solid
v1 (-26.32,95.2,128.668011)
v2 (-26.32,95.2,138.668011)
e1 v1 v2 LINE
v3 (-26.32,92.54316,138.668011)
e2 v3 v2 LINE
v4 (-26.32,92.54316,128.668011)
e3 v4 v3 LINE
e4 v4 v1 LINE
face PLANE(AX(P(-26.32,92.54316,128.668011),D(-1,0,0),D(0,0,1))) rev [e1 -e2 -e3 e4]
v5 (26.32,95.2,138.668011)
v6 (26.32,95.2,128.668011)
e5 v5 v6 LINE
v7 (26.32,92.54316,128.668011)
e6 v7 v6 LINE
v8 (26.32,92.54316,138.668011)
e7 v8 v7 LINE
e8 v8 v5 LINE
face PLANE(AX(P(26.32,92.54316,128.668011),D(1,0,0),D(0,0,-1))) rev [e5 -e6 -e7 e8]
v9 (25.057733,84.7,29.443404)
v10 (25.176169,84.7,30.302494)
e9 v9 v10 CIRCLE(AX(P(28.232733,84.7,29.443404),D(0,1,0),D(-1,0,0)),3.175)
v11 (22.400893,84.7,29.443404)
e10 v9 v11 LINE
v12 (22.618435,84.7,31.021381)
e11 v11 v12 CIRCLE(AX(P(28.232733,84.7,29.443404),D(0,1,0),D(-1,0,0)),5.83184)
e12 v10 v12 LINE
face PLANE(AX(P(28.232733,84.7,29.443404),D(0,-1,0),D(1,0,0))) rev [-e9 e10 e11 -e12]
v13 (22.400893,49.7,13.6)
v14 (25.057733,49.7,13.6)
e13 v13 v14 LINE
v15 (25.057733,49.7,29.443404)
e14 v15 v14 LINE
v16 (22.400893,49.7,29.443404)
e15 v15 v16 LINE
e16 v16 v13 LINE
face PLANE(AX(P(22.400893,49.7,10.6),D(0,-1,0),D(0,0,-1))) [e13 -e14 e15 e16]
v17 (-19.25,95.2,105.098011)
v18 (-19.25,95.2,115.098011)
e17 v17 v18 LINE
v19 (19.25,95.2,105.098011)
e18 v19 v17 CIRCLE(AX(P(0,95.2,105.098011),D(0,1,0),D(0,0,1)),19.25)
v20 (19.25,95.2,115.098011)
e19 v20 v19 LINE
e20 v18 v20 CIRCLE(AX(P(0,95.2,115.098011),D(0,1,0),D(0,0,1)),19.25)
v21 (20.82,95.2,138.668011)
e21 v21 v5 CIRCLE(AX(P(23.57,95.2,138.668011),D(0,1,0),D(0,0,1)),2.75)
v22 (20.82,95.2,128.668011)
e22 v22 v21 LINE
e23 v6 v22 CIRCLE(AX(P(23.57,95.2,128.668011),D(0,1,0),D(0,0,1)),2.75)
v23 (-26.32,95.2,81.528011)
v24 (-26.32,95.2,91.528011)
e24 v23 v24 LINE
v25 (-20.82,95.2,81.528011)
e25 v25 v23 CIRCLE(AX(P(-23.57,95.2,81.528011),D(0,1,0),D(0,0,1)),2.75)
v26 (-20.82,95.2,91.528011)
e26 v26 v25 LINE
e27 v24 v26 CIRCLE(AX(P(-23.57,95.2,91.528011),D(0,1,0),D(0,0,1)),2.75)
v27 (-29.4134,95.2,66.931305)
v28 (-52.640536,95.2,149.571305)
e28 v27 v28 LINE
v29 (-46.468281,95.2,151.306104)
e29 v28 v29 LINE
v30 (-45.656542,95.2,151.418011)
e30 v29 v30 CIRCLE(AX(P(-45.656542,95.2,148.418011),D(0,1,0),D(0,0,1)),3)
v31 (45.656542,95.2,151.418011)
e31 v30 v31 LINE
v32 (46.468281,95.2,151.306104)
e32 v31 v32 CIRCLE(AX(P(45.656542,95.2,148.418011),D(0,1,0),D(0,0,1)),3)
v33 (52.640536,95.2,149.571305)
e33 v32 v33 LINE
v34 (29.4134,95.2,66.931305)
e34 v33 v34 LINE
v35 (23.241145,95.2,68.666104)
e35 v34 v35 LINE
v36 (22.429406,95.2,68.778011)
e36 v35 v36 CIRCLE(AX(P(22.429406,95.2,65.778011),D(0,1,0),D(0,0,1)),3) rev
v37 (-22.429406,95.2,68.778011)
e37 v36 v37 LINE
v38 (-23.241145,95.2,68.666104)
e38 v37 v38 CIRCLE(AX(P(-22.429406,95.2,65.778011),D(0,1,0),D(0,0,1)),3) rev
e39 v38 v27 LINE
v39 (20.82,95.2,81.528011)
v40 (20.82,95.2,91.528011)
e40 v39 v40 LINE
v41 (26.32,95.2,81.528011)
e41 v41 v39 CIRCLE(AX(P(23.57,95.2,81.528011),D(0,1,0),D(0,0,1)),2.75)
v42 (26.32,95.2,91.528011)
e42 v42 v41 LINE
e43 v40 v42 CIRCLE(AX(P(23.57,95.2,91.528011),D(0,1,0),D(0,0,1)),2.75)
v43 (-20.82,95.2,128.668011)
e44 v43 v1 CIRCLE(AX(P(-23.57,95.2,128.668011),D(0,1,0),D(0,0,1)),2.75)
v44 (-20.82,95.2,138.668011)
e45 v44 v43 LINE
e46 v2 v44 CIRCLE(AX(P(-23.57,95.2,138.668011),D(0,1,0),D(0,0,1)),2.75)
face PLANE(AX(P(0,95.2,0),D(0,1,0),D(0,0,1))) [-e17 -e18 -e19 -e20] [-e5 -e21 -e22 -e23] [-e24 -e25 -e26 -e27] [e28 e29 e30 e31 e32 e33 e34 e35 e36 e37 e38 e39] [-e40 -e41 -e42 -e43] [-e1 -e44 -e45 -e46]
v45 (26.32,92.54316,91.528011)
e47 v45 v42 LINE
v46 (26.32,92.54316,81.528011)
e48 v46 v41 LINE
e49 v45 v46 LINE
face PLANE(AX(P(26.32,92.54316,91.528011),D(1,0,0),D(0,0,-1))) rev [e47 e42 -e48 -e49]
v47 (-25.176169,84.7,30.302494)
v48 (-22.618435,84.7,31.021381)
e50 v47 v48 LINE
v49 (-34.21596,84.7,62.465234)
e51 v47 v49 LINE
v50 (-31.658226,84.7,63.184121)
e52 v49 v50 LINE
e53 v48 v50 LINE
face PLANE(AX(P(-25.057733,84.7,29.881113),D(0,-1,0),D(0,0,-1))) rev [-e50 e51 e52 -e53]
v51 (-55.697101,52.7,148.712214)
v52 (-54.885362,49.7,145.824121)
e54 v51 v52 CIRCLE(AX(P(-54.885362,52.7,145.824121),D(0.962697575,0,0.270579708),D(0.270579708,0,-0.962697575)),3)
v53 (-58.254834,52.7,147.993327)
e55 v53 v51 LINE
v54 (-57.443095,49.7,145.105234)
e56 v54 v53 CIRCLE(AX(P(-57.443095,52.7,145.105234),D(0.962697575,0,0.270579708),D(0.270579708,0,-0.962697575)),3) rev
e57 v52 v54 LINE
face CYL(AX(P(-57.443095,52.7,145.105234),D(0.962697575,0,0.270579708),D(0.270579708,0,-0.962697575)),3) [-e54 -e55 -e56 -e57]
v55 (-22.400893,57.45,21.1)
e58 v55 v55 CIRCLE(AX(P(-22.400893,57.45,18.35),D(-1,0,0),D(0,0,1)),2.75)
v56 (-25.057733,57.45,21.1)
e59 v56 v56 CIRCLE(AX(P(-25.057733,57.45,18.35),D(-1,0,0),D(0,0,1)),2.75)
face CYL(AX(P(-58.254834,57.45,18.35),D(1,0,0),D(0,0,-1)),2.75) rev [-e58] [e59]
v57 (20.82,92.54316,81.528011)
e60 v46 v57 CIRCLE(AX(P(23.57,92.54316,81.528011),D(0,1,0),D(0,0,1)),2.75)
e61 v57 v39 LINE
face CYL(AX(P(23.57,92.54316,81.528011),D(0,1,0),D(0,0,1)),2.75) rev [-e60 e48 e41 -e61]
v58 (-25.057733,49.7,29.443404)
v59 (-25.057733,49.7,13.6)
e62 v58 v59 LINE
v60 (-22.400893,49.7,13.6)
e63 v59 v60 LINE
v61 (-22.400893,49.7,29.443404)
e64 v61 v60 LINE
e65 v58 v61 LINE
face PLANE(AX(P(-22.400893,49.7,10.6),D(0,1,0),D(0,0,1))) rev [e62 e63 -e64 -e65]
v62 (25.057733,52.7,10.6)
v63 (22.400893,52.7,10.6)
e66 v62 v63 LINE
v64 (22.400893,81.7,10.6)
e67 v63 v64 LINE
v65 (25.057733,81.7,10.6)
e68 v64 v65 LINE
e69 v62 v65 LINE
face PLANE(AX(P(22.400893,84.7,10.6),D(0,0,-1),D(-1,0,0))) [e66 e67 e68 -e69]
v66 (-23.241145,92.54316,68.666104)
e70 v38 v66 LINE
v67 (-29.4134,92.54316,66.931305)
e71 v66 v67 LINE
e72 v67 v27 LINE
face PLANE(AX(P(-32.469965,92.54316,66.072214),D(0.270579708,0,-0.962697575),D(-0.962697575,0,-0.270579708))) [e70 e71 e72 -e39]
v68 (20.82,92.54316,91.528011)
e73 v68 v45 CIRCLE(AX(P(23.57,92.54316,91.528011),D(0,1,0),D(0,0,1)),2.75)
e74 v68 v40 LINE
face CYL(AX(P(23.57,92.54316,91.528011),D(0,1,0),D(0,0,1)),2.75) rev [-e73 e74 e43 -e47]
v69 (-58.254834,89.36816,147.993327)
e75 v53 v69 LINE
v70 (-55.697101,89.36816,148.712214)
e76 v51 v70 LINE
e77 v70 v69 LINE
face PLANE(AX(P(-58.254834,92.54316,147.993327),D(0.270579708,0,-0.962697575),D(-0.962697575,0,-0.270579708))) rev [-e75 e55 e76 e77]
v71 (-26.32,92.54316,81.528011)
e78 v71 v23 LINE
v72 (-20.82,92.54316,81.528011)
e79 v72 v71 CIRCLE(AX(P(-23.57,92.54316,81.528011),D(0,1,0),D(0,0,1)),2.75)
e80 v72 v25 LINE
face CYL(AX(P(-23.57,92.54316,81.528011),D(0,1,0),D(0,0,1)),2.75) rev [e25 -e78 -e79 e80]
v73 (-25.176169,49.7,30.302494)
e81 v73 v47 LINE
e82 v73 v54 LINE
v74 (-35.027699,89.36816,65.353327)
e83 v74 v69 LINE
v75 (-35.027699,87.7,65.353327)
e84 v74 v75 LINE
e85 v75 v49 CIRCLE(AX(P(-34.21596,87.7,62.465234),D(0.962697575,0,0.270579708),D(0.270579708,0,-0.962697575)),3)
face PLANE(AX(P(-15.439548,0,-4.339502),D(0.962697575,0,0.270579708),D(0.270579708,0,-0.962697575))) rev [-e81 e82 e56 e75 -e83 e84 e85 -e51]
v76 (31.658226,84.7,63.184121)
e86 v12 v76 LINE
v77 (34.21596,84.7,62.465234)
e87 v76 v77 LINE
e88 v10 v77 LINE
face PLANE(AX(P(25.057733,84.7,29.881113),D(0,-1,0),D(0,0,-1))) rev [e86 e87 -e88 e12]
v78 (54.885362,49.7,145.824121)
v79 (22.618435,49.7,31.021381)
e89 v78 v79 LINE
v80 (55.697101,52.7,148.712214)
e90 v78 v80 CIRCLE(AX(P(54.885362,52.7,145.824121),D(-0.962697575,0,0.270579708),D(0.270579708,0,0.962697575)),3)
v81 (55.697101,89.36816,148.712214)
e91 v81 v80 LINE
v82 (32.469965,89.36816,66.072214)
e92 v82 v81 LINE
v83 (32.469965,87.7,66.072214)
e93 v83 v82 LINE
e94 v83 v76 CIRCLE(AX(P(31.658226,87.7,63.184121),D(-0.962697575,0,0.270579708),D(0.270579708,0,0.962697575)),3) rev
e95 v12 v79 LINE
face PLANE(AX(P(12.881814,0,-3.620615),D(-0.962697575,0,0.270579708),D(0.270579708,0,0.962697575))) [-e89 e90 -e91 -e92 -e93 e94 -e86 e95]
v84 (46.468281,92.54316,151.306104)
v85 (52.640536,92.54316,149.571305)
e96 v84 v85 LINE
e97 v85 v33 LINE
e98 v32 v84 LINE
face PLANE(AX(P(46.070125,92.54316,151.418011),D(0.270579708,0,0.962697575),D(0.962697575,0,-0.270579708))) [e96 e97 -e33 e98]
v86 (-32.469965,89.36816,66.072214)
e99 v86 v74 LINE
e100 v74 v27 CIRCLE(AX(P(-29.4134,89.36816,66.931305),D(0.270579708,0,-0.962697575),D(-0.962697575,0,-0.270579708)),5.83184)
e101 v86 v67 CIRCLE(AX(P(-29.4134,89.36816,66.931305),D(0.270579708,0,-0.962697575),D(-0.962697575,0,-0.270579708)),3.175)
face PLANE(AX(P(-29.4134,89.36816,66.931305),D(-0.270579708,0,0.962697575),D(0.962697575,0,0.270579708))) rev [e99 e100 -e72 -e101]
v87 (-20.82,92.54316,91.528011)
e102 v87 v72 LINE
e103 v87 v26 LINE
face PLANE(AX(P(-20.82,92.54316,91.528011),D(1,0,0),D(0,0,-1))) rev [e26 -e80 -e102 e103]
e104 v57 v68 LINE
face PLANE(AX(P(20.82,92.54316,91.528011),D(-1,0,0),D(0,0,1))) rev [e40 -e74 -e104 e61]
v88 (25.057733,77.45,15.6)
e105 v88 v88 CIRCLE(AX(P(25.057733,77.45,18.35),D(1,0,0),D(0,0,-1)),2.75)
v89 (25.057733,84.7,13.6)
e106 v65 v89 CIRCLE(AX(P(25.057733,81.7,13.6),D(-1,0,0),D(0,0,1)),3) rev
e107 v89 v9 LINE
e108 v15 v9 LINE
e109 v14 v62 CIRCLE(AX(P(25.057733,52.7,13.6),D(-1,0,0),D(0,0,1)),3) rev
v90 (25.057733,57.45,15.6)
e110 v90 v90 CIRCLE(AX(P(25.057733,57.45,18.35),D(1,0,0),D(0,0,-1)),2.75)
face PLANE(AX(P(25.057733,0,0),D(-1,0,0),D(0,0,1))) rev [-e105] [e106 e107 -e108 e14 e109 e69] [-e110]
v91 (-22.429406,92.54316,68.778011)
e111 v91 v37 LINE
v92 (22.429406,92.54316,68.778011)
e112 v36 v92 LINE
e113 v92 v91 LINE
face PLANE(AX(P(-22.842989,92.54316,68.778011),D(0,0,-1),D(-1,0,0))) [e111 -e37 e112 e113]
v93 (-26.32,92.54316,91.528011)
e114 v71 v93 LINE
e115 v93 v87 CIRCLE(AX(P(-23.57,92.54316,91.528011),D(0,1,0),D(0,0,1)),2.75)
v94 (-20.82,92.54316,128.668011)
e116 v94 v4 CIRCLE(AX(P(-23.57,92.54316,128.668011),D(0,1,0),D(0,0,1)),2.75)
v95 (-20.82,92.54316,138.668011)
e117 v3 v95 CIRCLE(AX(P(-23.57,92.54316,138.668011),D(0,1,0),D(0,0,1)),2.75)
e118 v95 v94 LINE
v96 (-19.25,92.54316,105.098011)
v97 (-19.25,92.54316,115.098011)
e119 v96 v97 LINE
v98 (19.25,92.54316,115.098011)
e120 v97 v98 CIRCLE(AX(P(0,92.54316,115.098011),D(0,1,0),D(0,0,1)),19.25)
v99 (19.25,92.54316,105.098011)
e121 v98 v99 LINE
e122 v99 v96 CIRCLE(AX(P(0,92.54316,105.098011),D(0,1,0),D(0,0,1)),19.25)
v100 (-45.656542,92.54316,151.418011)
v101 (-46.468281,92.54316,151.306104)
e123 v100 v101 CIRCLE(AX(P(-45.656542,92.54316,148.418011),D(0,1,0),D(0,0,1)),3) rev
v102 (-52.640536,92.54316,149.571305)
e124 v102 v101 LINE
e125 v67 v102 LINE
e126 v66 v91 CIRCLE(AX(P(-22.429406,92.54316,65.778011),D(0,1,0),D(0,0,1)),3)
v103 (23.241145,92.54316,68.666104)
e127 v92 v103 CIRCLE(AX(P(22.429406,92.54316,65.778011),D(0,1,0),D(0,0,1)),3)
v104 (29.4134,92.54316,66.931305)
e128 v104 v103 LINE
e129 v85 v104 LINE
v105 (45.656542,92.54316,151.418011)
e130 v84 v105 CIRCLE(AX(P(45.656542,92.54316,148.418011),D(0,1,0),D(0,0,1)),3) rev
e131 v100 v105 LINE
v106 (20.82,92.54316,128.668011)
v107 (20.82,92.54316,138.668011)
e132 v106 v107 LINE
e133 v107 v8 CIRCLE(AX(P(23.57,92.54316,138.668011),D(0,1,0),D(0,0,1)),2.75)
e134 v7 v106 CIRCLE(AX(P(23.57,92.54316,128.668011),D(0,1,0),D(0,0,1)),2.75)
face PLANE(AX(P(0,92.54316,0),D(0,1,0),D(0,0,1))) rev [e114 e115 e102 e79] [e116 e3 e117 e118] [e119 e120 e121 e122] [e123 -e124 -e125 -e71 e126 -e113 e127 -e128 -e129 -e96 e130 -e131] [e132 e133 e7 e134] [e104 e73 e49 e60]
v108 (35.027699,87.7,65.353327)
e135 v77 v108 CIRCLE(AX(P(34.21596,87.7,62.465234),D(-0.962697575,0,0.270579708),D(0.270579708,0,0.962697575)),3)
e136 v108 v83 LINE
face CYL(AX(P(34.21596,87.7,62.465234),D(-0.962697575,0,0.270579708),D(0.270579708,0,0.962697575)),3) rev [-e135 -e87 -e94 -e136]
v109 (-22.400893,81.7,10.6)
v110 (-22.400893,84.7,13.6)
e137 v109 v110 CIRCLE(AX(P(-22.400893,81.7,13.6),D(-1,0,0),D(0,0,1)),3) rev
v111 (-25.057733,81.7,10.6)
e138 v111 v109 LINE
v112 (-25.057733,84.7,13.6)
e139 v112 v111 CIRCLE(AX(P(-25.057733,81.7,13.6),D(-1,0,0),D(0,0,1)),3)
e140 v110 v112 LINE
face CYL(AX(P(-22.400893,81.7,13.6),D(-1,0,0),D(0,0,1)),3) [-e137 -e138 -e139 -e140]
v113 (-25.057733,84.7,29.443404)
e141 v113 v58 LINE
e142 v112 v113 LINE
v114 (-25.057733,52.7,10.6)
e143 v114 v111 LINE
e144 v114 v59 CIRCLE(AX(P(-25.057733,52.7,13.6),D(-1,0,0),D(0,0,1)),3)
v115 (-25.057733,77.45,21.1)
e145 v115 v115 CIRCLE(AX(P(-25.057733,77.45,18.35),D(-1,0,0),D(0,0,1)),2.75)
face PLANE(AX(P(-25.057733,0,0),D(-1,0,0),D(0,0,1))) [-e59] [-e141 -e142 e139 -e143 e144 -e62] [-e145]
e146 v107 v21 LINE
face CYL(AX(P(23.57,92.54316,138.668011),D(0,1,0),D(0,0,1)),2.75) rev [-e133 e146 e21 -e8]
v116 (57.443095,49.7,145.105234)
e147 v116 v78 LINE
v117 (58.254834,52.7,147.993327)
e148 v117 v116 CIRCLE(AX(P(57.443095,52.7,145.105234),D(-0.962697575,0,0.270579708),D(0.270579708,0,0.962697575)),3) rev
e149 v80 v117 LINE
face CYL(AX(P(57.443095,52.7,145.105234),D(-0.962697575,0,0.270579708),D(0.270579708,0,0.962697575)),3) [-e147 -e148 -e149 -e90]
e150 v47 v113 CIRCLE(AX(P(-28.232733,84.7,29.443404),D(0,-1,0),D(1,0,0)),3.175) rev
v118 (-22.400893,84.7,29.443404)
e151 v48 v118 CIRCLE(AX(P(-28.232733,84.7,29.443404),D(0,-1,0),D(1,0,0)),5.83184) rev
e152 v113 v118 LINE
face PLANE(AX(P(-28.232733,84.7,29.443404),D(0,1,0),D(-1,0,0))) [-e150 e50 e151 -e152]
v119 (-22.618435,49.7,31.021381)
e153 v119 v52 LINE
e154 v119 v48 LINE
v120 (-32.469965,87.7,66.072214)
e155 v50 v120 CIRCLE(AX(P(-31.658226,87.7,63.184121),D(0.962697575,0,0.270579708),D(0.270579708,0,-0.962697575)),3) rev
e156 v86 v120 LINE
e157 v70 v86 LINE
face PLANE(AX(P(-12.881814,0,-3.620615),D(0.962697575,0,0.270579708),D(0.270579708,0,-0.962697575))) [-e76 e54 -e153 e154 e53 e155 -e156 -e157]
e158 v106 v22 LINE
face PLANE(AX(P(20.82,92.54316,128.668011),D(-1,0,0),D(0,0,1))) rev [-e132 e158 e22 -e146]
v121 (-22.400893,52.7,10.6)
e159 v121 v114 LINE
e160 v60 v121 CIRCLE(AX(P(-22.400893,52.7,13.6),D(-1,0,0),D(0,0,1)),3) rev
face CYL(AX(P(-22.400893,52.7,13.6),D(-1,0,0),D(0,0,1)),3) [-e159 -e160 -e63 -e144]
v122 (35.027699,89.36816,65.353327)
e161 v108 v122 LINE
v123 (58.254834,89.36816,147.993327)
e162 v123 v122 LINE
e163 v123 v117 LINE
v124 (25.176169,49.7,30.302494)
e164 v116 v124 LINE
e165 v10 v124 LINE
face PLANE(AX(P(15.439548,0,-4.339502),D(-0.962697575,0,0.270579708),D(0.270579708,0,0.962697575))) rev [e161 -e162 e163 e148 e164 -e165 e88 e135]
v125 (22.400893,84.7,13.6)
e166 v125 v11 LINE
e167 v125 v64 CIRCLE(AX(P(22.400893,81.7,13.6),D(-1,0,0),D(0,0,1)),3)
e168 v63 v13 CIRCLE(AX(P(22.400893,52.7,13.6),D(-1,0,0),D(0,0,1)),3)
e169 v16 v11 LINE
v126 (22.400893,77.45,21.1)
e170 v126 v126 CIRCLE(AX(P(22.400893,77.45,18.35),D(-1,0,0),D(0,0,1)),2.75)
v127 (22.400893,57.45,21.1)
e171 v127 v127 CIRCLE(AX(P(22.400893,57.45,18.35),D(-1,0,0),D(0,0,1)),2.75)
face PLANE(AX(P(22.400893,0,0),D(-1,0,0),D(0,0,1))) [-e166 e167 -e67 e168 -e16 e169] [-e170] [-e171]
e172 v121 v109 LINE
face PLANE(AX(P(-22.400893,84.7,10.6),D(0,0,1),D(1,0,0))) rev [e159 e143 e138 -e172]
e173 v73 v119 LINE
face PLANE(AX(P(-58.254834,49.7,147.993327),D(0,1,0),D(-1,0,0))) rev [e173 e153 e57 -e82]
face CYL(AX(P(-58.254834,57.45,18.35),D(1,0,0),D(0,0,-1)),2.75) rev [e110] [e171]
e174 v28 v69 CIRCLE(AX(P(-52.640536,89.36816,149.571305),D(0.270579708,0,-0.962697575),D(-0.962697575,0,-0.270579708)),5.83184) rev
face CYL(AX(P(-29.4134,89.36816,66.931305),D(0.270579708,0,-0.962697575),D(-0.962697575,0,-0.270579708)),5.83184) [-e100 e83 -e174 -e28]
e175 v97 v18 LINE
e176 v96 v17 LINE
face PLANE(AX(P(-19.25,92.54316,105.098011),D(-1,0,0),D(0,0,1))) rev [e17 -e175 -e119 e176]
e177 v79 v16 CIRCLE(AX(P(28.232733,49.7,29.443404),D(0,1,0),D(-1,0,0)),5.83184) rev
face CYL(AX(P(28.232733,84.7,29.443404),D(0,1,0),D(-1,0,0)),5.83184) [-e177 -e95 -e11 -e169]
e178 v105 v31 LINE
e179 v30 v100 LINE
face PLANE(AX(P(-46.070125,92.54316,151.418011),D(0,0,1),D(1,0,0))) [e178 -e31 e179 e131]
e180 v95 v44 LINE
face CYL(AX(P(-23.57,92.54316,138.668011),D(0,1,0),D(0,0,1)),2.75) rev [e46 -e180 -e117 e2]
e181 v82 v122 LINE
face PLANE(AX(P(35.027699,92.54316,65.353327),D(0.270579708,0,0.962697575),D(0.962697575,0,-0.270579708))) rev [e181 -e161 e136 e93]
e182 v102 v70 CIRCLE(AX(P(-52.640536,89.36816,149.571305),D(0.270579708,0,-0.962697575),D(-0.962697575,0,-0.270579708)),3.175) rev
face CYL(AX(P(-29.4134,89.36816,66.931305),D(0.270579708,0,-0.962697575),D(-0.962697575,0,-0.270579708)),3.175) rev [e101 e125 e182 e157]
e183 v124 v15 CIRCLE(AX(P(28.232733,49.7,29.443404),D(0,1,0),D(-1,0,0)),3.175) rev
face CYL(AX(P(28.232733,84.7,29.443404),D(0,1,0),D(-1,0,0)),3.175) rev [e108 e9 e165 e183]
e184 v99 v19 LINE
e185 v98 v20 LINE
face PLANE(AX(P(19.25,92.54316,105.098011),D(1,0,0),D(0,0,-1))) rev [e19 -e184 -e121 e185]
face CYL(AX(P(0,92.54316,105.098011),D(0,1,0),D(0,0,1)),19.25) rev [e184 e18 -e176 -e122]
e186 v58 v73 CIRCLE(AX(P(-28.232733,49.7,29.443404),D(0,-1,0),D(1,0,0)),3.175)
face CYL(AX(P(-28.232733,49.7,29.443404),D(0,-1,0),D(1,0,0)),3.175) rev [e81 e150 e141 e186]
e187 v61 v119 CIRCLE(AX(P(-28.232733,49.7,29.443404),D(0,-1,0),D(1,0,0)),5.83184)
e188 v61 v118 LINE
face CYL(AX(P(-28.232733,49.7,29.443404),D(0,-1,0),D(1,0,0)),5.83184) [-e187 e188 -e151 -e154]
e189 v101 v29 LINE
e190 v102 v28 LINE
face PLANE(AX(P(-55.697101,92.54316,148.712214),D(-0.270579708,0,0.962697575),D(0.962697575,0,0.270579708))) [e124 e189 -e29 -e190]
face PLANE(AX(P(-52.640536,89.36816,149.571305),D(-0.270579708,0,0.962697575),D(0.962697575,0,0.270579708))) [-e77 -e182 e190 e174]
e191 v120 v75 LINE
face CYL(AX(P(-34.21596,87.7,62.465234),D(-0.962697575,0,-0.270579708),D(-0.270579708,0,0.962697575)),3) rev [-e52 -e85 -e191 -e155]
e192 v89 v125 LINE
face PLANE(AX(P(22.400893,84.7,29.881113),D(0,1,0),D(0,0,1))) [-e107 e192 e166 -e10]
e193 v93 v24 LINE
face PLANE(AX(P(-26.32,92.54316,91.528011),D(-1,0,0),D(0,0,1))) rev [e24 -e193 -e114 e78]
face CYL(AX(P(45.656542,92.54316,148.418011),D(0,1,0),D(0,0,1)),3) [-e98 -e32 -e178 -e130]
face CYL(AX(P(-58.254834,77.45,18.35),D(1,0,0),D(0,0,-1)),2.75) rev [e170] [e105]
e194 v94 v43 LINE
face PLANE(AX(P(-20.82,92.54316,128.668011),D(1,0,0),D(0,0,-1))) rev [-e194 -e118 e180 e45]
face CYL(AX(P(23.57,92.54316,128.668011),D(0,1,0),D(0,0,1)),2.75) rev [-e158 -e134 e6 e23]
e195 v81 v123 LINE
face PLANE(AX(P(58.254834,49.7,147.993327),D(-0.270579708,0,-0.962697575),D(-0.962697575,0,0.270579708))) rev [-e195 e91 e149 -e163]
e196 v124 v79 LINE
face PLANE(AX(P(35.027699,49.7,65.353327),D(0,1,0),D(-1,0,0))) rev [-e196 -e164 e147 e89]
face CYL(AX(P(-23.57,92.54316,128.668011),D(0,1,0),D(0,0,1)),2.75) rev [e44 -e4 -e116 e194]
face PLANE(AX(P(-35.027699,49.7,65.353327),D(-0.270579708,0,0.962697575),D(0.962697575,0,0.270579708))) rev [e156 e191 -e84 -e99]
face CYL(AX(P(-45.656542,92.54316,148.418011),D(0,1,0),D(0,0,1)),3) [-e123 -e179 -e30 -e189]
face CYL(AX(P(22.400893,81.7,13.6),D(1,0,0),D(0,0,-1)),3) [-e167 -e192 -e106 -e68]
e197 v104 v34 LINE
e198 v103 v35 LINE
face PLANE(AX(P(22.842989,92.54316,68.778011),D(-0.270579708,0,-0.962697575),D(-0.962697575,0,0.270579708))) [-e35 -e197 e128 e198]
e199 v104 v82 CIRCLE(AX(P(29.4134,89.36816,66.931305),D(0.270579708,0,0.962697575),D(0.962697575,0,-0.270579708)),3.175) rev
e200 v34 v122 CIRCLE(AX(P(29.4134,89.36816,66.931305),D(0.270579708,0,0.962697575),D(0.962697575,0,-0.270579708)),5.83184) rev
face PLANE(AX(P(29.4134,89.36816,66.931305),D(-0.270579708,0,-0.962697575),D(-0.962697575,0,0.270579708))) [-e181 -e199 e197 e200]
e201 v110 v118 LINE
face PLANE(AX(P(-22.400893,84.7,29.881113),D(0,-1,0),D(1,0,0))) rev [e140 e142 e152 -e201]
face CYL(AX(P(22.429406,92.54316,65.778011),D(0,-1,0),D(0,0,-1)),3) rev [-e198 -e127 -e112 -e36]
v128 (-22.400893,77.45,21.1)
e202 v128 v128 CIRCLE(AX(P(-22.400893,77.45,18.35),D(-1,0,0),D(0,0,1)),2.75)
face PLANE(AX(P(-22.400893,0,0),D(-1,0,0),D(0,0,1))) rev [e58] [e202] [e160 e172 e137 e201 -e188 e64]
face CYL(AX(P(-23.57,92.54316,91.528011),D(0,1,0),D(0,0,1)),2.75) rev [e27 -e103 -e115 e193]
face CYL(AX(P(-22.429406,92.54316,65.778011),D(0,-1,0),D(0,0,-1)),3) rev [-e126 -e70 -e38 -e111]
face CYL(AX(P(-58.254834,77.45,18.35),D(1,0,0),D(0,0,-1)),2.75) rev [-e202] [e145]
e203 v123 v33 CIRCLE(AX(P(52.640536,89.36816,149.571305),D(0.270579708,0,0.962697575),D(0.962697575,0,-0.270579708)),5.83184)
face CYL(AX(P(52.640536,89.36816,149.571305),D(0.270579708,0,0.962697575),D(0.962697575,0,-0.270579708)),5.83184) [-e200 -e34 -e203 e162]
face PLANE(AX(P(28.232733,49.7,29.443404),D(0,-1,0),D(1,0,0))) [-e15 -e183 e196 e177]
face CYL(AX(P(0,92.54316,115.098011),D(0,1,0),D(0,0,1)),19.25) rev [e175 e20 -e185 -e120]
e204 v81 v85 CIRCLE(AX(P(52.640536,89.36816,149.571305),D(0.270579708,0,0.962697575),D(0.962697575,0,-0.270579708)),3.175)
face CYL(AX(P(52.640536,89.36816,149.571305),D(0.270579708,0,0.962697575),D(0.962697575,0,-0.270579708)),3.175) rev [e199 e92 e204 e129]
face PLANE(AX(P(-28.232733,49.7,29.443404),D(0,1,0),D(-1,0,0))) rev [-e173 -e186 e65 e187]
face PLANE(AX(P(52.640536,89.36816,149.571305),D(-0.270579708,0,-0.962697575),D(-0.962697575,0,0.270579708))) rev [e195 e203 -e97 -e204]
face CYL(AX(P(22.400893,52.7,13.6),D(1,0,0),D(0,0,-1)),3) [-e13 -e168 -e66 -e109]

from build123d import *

# Parameters (mm, degrees)
BASE_FLANGE1_DEPTH             = 2.65684
EDGE_FLANGE2_STRIP_W           = 16.97736
EDGE_FLANGE2_STRIP_H           = 2.65684
EDGE_FLANGE2_STRIP_CUT_DEPTH   = 85.842119192
EDGE_FLANGE2_STRIP_2_W         = 16.97736
EDGE_FLANGE2_STRIP_2_H         = 2.65684
EDGE_FLANGE2_STRIP_CUT_2_DEPTH = 85.842119192
EDGE_FLANGE2_DEPTH             = 85.842119192
EDGE_FLANGE2_BEND_DEPTH        = 85.842119192
SKETCH22_W                     = 2.65684
SKETCH22_H                     = 35
BOSS_EXTRUDE1_DEPTH            = 36.846685
SKETCH24_W                     = 2.65684
SKETCH24_H                     = 35
BOSS_EXTRUDE2_DEPTH            = 36.846685
EDGE_FLANGE3_STRIP_CUT_DEPTH   = 35
EDGE_FLANGE3_DEPTH             = 35
EDGE_FLANGE4_STRIP_CUT_DEPTH   = 35
EDGE_FLANGE4_DEPTH             = 35
SKETCH32_R                     = 2.75
CUT_EXTRUDE1_DEPTH             = 198.310511697
FILLET1_R                      = 3


# Sheet-metal steps are written as plain solids
with BuildPart() as part:
    # Sketch4 → Base-Flange1 (new body)
    with BuildSketch(Plane(origin=(0, 95.2, 0), x_dir=(1, 0, 0), z_dir=(0, 1, 0))):
        Polygon((-55.697100796, -148.712214058), (-46.070125043, -151.418011142), (46.070125043, -151.418011142), (55.697100796, -148.712214058), (32.469965214, -66.072214058), (22.842989462, -68.778011142), (-22.842989462, -68.778011142), (-32.469965214, -66.072214058), align=None)
        with BuildLine():
            Line((-26.32, -128.668011142), (-26.32, -138.668011142))
            ThreePointArc((-26.32, -138.668011142), (-23.57, -141.418011142), (-20.82, -138.668011142))
            Line((-20.82, -138.668011142), (-20.82, -128.668011142))
            ThreePointArc((-20.82, -128.668011142), (-23.57, -125.918011142), (-26.32, -128.668011142))
        make_face(mode=Mode.SUBTRACT)
        with BuildLine():
            Line((20.82, -128.668011142), (20.82, -138.668011142))
            ThreePointArc((20.82, -138.668011142), (23.57, -141.418011142), (26.32, -138.668011142))
            Line((26.32, -138.668011142), (26.32, -128.668011142))
            ThreePointArc((26.32, -128.668011142), (23.57, -125.918011142), (20.82, -128.668011142))
        make_face(mode=Mode.SUBTRACT)
        with BuildLine():
            Line((20.82, -91.528011142), (20.82, -81.528011142))
            ThreePointArc((20.82, -81.528011142), (23.57, -78.778011142), (26.32, -81.528011142))
            Line((26.32, -81.528011142), (26.32, -91.528011142))
            ThreePointArc((26.32, -91.528011142), (23.57, -94.278011142), (20.82, -91.528011142))
        make_face(mode=Mode.SUBTRACT)
        with BuildLine():
            Line((-19.25, -105.098011142), (-19.25, -115.098011142))
            ThreePointArc((-19.25, -115.098011142), (0, -134.348011142), (19.25, -115.098011142))
            Line((19.25, -115.098011142), (19.25, -105.098011142))
            ThreePointArc((19.25, -105.098011142), (0, -85.848011142), (-19.25, -105.098011142))
        make_face(mode=Mode.SUBTRACT)
        with BuildLine():
            Line((-20.82, -91.528011142), (-20.82, -81.528011142))
            ThreePointArc((-20.82, -81.528011142), (-23.57, -78.778011142), (-26.32, -81.528011142))
            Line((-26.32, -81.528011142), (-26.32, -91.528011142))
            ThreePointArc((-26.32, -91.528011142), (-23.57, -94.278011142), (-20.82, -91.528011142))
        make_face(mode=Mode.SUBTRACT)
    extrude(amount=-BASE_FLANGE1_DEPTH)

    # Edge-Flange2 strip (across the edge) → Edge-Flange2 strip cut (cut)
    with BuildSketch(Plane(origin=(32.469965214, 92.54316, 66.072214058), x_dir=(-0.9626975752484609, -3.4914813388431334e-15, 0.2705797084238469), z_dir=(0.2705797084238469, 0, 0.9626975752484609))):
        with Locations((-5.31368, -1.32842)):
            Rectangle(EDGE_FLANGE2_STRIP_W, EDGE_FLANGE2_STRIP_H)
    extrude(amount=EDGE_FLANGE2_STRIP_CUT_DEPTH, mode=Mode.SUBTRACT)

    # Edge-Flange2 strip 2 (across the edge) → Edge-Flange2 strip cut 2 (cut)
    with BuildSketch(Plane(origin=(-55.697100796, 92.54316, 148.712214058), x_dir=(0.9626975752484602, -3.4914813388431334e-15, 0.2705797084238493), z_dir=(0.2705797084238493, 0, -0.9626975752484602))):
        with Locations((-5.31368, -1.32842)):
            Rectangle(EDGE_FLANGE2_STRIP_2_W, EDGE_FLANGE2_STRIP_2_H)
    extrude(amount=EDGE_FLANGE2_STRIP_CUT_2_DEPTH, mode=Mode.SUBTRACT)

    # Edge-Flange2 section (across the edge) → Edge-Flange2 (add)
    with BuildSketch(Plane(origin=(32.469965214, 92.54316, 66.072214058), x_dir=(-0.9626975752484609, -3.4914813388431334e-15, 0.2705797084238469), z_dir=(0.2705797084238469, 0, 0.9626975752484609))):
        with BuildLine():
            Line((-2.65684, 3.175), (-2.65684, 42.84316))
            Line((-2.65684, 42.84316), (0, 42.84316))
            Line((0, 42.84316), (0, 3.175))
            ThreePointArc((0, 3.175), (0.92993597, 0.92993597), (3.175, 0))
            Line((3.175, 0), (3.175, -2.65684))
            ThreePointArc((3.175, -2.65684), (-0.948733611, -0.948733611), (-2.65684, 3.175))
        make_face()
    extrude(amount=EDGE_FLANGE2_DEPTH)

    # Edge-Flange2 section 2 (across the edge) → Edge-Flange2 bend (add)
    with BuildSketch(Plane(origin=(-55.697100796, 92.54316, 148.712214058), x_dir=(0.9626975752484602, -3.4914813388431334e-15, 0.2705797084238493), z_dir=(0.2705797084238493, 0, -0.9626975752484602))):
        with BuildLine():
            Line((-2.65684, 3.175), (-2.65684, 42.84316))
            Line((-2.65684, 42.84316), (0, 42.84316))
            Line((0, 42.84316), (0, 3.175))
            ThreePointArc((0, 3.175), (0.92993597, 0.92993597), (3.175, 0))
            Line((3.175, 0), (3.175, -2.65684))
            ThreePointArc((3.175, -2.65684), (-0.948733611, -0.948733611), (-2.65684, 3.175))
        make_face()
    extrude(amount=EDGE_FLANGE2_BEND_DEPTH)

    # Sketch22 → Boss-Extrude1 (add)
    with BuildSketch(Plane(origin=(19.588150967, 0, 69.69282933), x_dir=(-0.9626975752484609, 0, 0.2705797084238468), z_dir=(-0.2705797084238468, 0, -0.9626975752484609))):
        with Locations((-14.709376365, 67.2)):
            Rectangle(SKETCH22_W, SKETCH22_H)
    extrude(amount=BOSS_EXTRUDE1_DEPTH)

    # Sketch24 → Boss-Extrude2 (add)
    with BuildSketch(Plane(origin=(-19.588150967, 0, 69.69282933), x_dir=(-0.9626975752484602, 0, -0.27057970842384926), z_dir=(0.27057970842384926, 0, -0.9626975752484602))):
        with Locations((14.709376365, 67.2)):
            Rectangle(SKETCH24_W, SKETCH24_H)
    extrude(amount=BOSS_EXTRUDE2_DEPTH)

    # Edge-Flange3 strip (across the edge) → Edge-Flange3 strip cut (cut)
    with BuildSketch(Plane(origin=(25.057733426, 49.7, 29.881113007), x_dir=(1, 0, 0), z_dir=(0, 1, 0))):
        Polygon((-7.033027346, 15.203794832), (-2.439298227, -1.140268474), (0.118435199, -0.421381482), (-4.47529392, 15.922681824), align=None)
    extrude(amount=EDGE_FLANGE3_STRIP_CUT_DEPTH, mode=Mode.SUBTRACT)

    # Edge-Flange3 section (across the edge) → Edge-Flange3 (add)
    with BuildSketch(Plane(origin=(25.057733426, 49.7, 29.881113007), x_dir=(1, 0, 0), z_dir=(0, 1, 0))):
        with BuildLine():
            Line((-2.65684, 0.437709092), (-2.65684, 19.281113007))
            Line((-2.65684, 19.281113007), (0, 19.281113007))
            Line((0, 19.281113007), (0, 0.437709092))
            ThreePointArc((0, 0.437709092), (0.029748162, 0.004101115), (0.118435199, -0.421381482))
            Line((0.118435199, -0.421381482), (-2.439298227, -1.140268474))
            ThreePointArc((-2.439298227, -1.140268474), (-2.602198575, -0.35874204), (-2.65684, 0.437709092))
        make_face()
    extrude(amount=EDGE_FLANGE3_DEPTH)

    # Edge-Flange4 strip (across the edge) → Edge-Flange4 strip cut (cut)
    with BuildSketch(Plane(origin=(-25.057733426, 84.7, 29.881113007), x_dir=(-1, 0, 0), z_dir=(0, -1, 0))):
        Polygon((-7.033027346, 15.203794832), (-2.439298227, -1.140268474), (0.118435199, -0.421381482), (-4.47529392, 15.922681824), align=None)
    extrude(amount=EDGE_FLANGE4_STRIP_CUT_DEPTH, mode=Mode.SUBTRACT)

    # Edge-Flange4 section (across the edge) → Edge-Flange4 (add)
    with BuildSketch(Plane(origin=(-25.057733426, 84.7, 29.881113007), x_dir=(-1, 0, 0), z_dir=(0, -1, 0))):
        with BuildLine():
            Line((-2.65684, 0.437709092), (-2.65684, 19.281113007))
            Line((-2.65684, 19.281113007), (0, 19.281113007))
            Line((0, 19.281113007), (0, 0.437709092))
            ThreePointArc((0, 0.437709092), (0.029748162, 0.004101115), (0.118435199, -0.421381482))
            Line((0.118435199, -0.421381482), (-2.439298227, -1.140268474))
            ThreePointArc((-2.439298227, -1.140268474), (-2.602198575, -0.35874204), (-2.65684, 0.437709092))
        make_face()
    extrude(amount=EDGE_FLANGE4_DEPTH)

    # Sketch32 → Cut-Extrude1 (cut, through all)
    with BuildSketch(Plane(origin=(25.057733426, 0, 0), x_dir=(0, 0, -1), z_dir=(1, 0, 0))):
        with Locations(Location((-18.35, 77.45, 0), (0, 0, 180))):
            Circle(SKETCH32_R)
        with Locations(Location((-18.35, 57.45, 0), (0, 0, 180))):
            Circle(SKETCH32_R)
    extrude(amount=-CUT_EXTRUDE1_DEPTH, mode=Mode.SUBTRACT)

    # Fillet1
    fillet1_edges = [part.edges().sort_by_distance(p)[0] for p in [
        (56.975967508, 49.7, 148.352770562),
        (-22.842989462, 93.87158, 68.778011142),
        (22.842989462, 93.87158, 68.778011142),
        (46.070125043, 93.87158, 151.418011142),
        (-46.070125043, 93.87158, 151.418011142),
        (-56.975967508, 49.7, 148.352770562),
        (33.748831927, 84.7, 65.712770562),
        (-33.748831927, 84.7, 65.712770562),
        (23.729313426, 49.7, 10.6),
        (23.729313426, 84.7, 10.6),
        (-23.729313426, 84.7, 10.6),
        (-23.729313426, 49.7, 10.6),
    ]]
    fillet(fillet1_edges, radius=FILLET1_R)


solid = part.part
